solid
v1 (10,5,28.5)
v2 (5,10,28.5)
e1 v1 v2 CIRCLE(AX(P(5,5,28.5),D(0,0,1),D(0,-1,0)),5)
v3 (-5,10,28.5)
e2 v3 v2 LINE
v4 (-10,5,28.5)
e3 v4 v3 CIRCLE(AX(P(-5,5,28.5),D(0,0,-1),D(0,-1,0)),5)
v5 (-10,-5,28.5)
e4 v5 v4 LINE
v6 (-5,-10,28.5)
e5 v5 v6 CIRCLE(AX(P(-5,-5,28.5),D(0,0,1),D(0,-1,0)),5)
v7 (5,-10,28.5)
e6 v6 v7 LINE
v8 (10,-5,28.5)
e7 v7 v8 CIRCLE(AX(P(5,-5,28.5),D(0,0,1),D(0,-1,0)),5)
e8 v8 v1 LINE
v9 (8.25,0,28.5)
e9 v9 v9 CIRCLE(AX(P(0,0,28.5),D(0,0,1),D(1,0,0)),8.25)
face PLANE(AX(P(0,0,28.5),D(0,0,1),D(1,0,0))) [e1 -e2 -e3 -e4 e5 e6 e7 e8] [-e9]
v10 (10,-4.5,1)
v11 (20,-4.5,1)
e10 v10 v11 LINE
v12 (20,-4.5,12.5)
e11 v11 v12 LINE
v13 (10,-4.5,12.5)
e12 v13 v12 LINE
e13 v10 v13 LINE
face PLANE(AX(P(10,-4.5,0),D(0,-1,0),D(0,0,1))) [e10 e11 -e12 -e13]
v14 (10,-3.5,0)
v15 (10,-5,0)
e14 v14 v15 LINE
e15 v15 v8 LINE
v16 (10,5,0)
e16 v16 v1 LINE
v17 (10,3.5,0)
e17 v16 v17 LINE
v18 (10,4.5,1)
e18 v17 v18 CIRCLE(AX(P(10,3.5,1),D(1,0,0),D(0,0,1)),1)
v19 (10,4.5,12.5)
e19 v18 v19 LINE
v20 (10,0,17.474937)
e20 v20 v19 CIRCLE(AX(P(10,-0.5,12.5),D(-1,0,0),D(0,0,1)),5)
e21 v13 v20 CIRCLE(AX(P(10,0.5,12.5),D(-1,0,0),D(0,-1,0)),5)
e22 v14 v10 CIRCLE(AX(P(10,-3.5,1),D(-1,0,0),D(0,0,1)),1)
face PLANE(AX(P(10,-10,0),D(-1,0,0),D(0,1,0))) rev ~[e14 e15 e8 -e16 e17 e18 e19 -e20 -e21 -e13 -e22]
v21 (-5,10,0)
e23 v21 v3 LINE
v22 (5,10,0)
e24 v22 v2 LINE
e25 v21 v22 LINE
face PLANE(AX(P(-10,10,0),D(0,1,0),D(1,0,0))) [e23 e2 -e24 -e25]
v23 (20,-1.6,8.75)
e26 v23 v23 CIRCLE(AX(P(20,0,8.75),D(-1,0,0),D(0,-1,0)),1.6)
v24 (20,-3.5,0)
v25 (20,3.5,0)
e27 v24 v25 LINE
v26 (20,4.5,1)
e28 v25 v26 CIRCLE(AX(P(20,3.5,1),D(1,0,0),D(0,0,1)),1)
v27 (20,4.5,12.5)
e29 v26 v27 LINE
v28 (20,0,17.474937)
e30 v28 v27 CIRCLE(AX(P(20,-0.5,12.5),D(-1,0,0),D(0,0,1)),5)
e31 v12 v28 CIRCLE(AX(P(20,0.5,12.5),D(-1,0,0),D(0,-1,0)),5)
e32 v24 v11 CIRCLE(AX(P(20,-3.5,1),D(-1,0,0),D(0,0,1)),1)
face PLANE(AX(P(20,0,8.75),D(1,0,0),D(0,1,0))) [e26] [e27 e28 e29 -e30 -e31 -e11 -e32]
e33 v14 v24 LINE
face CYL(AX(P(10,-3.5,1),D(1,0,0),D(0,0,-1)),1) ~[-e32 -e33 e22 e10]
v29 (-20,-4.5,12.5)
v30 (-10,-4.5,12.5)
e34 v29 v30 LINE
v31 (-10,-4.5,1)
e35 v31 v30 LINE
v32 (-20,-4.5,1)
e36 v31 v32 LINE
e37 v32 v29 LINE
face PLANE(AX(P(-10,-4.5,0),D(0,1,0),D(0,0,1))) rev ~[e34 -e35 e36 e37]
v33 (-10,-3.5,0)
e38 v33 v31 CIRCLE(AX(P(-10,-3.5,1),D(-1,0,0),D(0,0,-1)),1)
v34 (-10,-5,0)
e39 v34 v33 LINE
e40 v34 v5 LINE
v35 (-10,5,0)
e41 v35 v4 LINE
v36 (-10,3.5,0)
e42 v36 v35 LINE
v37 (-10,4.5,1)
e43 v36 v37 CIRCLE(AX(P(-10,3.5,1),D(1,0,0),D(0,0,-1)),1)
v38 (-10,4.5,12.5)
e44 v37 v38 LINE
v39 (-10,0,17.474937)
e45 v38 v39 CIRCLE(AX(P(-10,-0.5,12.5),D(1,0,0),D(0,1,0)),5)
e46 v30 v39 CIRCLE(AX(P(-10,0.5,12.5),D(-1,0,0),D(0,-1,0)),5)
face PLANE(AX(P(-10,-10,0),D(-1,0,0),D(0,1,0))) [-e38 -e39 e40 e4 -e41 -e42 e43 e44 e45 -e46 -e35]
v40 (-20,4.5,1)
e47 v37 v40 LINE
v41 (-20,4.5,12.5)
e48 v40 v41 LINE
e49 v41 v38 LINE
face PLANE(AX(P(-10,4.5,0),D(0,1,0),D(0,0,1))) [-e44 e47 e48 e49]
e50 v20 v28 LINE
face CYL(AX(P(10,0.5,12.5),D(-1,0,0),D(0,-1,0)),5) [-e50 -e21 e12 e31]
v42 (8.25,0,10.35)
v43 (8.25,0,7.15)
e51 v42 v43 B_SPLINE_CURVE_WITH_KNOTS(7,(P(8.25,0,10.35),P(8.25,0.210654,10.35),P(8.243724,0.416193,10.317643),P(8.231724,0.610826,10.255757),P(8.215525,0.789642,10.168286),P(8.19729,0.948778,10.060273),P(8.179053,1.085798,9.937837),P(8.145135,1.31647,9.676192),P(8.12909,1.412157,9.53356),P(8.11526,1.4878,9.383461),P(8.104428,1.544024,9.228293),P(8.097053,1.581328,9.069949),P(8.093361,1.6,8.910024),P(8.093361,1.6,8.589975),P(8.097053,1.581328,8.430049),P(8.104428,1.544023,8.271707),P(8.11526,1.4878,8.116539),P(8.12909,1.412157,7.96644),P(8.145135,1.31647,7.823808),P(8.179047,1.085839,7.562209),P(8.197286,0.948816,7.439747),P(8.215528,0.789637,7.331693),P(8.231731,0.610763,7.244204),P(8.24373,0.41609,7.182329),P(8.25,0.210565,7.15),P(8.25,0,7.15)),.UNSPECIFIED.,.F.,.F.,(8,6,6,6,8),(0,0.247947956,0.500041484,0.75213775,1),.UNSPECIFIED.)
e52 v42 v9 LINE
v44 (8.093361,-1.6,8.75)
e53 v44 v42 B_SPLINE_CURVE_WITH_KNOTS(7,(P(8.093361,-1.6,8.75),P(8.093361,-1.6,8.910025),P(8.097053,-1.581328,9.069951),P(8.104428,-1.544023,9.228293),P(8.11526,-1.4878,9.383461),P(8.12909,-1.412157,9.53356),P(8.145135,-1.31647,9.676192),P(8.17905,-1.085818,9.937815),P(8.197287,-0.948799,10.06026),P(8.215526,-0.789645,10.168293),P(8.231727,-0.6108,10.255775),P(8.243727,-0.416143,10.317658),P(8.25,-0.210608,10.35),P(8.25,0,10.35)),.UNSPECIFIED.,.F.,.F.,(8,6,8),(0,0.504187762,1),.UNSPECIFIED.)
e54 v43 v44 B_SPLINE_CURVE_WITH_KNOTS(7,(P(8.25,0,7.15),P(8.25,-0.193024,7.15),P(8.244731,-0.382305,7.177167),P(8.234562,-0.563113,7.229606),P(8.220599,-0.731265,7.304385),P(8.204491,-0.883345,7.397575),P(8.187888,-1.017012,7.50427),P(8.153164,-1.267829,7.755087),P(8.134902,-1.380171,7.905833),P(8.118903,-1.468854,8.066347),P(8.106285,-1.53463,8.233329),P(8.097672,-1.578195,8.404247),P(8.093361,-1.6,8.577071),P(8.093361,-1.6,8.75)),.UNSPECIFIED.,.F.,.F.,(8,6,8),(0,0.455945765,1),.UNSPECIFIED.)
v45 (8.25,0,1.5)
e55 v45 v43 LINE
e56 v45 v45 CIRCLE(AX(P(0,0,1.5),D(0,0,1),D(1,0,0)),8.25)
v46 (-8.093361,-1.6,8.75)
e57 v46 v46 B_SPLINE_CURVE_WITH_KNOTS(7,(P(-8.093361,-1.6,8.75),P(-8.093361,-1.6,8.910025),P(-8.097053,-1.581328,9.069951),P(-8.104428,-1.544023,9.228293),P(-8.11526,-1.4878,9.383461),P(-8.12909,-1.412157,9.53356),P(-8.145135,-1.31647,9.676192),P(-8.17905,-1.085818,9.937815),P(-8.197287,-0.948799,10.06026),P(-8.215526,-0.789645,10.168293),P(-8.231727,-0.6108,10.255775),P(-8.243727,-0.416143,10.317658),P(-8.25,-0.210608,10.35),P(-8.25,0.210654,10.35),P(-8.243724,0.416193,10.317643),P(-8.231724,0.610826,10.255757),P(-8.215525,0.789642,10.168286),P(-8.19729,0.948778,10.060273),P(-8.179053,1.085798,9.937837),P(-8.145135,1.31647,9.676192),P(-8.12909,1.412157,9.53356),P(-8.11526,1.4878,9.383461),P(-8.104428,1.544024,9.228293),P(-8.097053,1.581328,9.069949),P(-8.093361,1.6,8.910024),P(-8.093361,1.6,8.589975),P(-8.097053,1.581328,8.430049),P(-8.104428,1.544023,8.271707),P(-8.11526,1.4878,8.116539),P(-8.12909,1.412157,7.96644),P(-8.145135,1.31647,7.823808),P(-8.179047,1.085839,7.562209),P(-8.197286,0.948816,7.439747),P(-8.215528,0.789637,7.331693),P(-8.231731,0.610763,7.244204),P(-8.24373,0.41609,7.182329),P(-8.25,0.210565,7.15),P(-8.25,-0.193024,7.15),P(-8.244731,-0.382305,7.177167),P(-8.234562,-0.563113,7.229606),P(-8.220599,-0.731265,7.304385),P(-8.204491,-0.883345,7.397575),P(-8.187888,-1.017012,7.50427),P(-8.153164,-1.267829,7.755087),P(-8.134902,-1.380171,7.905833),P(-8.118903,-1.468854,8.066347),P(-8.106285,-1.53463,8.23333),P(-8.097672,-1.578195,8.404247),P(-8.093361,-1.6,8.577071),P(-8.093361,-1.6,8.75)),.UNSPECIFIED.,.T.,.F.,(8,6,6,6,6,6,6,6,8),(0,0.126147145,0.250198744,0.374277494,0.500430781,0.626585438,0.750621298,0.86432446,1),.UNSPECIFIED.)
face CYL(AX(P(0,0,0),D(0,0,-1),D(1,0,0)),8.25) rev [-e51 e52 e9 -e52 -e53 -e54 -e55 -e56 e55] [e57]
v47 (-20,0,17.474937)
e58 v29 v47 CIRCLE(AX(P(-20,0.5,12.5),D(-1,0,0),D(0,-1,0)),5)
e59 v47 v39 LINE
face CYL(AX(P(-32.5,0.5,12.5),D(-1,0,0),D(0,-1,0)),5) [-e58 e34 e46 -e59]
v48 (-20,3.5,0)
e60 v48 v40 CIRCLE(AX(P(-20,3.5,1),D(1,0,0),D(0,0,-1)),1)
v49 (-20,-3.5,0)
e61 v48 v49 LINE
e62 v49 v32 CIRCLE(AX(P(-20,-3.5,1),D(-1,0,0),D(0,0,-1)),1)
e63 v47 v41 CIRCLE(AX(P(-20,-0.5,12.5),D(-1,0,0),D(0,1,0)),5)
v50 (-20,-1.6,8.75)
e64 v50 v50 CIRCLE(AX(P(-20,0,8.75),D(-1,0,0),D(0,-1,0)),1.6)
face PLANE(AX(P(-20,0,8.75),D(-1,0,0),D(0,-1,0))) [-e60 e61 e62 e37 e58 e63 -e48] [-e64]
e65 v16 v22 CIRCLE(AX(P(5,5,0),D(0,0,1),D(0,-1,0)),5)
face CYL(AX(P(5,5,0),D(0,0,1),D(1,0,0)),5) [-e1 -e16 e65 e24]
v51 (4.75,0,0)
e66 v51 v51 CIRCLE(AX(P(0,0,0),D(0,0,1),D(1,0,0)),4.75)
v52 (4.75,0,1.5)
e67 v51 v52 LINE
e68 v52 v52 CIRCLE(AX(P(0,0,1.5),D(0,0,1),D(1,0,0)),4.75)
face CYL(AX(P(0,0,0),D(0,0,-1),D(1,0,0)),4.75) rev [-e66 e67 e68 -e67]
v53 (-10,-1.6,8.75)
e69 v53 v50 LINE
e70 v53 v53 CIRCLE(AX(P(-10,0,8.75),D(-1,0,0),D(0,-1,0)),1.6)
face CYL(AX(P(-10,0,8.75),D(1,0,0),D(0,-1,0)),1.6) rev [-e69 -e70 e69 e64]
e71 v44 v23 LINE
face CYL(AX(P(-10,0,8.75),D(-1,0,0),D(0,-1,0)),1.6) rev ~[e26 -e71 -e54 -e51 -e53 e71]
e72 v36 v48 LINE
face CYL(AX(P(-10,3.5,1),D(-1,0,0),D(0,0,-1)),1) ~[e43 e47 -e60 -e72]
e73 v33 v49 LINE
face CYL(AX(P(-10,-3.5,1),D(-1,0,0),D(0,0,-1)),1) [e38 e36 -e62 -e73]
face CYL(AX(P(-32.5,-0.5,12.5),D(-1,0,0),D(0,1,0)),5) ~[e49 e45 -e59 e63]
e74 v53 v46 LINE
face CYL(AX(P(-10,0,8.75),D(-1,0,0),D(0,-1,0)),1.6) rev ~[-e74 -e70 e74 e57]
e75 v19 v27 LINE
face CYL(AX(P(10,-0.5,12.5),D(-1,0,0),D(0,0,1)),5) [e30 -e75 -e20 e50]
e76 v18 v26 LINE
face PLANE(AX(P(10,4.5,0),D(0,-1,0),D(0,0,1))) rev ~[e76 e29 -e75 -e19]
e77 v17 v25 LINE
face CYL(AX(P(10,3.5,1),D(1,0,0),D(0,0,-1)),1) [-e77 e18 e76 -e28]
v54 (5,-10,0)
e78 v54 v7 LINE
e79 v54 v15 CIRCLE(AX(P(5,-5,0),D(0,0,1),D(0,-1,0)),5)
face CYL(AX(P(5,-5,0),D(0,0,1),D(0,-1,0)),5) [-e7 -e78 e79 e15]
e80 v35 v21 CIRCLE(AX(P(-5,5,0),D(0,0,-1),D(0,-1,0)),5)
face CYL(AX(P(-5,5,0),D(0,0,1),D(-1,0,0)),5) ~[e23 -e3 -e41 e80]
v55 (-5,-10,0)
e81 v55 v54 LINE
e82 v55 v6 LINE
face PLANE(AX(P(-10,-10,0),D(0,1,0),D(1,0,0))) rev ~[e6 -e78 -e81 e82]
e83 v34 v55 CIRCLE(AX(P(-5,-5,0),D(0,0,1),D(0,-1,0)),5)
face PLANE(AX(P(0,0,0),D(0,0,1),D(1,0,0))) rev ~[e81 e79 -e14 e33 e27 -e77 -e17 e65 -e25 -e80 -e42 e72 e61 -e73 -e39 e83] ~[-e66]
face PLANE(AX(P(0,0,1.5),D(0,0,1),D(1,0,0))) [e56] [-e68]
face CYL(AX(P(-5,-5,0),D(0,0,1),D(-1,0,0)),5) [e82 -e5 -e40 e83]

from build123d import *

# Parameters (mm, degrees)
F0_W         = 20
F0_H         = 20
F0_R         = 8.25
F1_DEPTH     = 28.5
F0_R_2       = 4.75
F2_DEPTH     = 1.5
F3_W         = 9
F3_H         = 17.5
F3_R         = 1.6
F4_DEPTH     = 10
F5_W         = 9
F5_H         = 17.5
F6_DEPTH     = 10
F7_DEPTH     = 30.001
F8_R         = 5
F9_T1_DEPTH  = 22.5
F10_T1_DEPTH = 22.5
F11_R        = 1


# Not quite as in the source:
# - a fillet or chamfer that OpenCascade refuses, or shapes differently, is made with other operations: its cross-section is extruded or revolved along the edge and cut away or added


with BuildPart() as f1:
    # F0 (on Top) → F1 (new body)
    with BuildSketch(Plane.XY):
        Rectangle(F0_W, F0_H)
        Circle(F0_R, mode=Mode.SUBTRACT)
    extrude(amount=F1_DEPTH)

    # F0 (on Top) → F2 (join)
    with BuildSketch(Plane.XY):
        Circle(F0_R)
        Circle(F0_R_2, mode=Mode.SUBTRACT)
    extrude(amount=F2_DEPTH)

    # F3 (on face) → F4 (join)
    with BuildSketch(Plane(origin=(-10, 0, 0), x_dir=(0, -1, 0), z_dir=(-1, 0, 0))):
        with Locations((0, 8.75)):
            Rectangle(F3_W, F3_H)
        with Locations((0, 8.75)):
            Circle(F3_R, mode=Mode.SUBTRACT)
    extrude(amount=F4_DEPTH)

    # F5 (on face) → F6 (join)
    with BuildSketch(Plane.YZ.offset(10)):
        with Locations((0, 8.75)):
            Rectangle(F5_W, F5_H)
    extrude(amount=F6_DEPTH)

    # F3 (on face) → F7 (cut, through all)
    with BuildSketch(Plane(origin=(-10, 0, 0), x_dir=(0, -1, 0), z_dir=(-1, 0, 0))):
        with Locations((0, 8.75)):
            Circle(F3_R)
    extrude(amount=-F7_DEPTH, mode=Mode.SUBTRACT)

    # F8
    f8_edges = [f1.edges().sort_by_distance(p)[0] for p in [
        (-10, -10, 14.25),
        (10, -10, 14.25),
        (10, 10, 14.25),
        (-10, 10, 14.25),
    ]]
    fillet(f8_edges, radius=F8_R)

    # F9: fillet of radius 5 on 2 edges, made by hand

    # F9_s2 → F9_t1 (cut)
    with BuildSketch(Plane.YZ.offset(10)):
        with BuildLine():
            ThreePointArc((-4.5, 12.5), (-3.0355339059, 16.0355339059), (0.5, 17.5))
            Line((0.5, 17.5), (-4.5, 17.5))
            Line((-4.5, 17.5), (-4.5, 12.5))
        make_face()
        with BuildLine():
            ThreePointArc((-0.5, 17.5), (3.0355339059, 16.0355339059), (4.5, 12.5))
            Line((4.5, 12.5), (4.5, 17.5))
            Line((4.5, 17.5), (-0.5, 17.5))
        make_face()
    extrude(amount=F9_T1_DEPTH, mode=Mode.SUBTRACT)

    # F10: fillet of radius 5 on 2 edges, made by hand

    # F10_s2 → F10_t1 (cut)
    with BuildSketch(Plane.YZ.offset(-32.5)):
        with BuildLine():
            ThreePointArc((-4.5, 12.5), (-3.0355339059, 16.0355339059), (0.5, 17.5))
            Line((0.5, 17.5), (-4.5, 17.5))
            Line((-4.5, 17.5), (-4.5, 12.5))
        make_face()
        with BuildLine():
            ThreePointArc((4.5, 12.5), (3.0355339059, 16.0355339059), (-0.5, 17.5))
            Line((-0.5, 17.5), (4.5, 17.5))
            Line((4.5, 17.5), (4.5, 12.5))
        make_face()
    extrude(amount=F10_T1_DEPTH, mode=Mode.SUBTRACT)

    # F11
    f11_edges = [f1.edges().sort_by_distance(p)[0] for p in [
        (15, -4.5, 0),
        (15, 4.5, 0),
        (-15, 4.5, 0),
        (-15, -4.5, 0),
    ]]
    fillet(f11_edges, radius=F11_R)


solid = f1.part
